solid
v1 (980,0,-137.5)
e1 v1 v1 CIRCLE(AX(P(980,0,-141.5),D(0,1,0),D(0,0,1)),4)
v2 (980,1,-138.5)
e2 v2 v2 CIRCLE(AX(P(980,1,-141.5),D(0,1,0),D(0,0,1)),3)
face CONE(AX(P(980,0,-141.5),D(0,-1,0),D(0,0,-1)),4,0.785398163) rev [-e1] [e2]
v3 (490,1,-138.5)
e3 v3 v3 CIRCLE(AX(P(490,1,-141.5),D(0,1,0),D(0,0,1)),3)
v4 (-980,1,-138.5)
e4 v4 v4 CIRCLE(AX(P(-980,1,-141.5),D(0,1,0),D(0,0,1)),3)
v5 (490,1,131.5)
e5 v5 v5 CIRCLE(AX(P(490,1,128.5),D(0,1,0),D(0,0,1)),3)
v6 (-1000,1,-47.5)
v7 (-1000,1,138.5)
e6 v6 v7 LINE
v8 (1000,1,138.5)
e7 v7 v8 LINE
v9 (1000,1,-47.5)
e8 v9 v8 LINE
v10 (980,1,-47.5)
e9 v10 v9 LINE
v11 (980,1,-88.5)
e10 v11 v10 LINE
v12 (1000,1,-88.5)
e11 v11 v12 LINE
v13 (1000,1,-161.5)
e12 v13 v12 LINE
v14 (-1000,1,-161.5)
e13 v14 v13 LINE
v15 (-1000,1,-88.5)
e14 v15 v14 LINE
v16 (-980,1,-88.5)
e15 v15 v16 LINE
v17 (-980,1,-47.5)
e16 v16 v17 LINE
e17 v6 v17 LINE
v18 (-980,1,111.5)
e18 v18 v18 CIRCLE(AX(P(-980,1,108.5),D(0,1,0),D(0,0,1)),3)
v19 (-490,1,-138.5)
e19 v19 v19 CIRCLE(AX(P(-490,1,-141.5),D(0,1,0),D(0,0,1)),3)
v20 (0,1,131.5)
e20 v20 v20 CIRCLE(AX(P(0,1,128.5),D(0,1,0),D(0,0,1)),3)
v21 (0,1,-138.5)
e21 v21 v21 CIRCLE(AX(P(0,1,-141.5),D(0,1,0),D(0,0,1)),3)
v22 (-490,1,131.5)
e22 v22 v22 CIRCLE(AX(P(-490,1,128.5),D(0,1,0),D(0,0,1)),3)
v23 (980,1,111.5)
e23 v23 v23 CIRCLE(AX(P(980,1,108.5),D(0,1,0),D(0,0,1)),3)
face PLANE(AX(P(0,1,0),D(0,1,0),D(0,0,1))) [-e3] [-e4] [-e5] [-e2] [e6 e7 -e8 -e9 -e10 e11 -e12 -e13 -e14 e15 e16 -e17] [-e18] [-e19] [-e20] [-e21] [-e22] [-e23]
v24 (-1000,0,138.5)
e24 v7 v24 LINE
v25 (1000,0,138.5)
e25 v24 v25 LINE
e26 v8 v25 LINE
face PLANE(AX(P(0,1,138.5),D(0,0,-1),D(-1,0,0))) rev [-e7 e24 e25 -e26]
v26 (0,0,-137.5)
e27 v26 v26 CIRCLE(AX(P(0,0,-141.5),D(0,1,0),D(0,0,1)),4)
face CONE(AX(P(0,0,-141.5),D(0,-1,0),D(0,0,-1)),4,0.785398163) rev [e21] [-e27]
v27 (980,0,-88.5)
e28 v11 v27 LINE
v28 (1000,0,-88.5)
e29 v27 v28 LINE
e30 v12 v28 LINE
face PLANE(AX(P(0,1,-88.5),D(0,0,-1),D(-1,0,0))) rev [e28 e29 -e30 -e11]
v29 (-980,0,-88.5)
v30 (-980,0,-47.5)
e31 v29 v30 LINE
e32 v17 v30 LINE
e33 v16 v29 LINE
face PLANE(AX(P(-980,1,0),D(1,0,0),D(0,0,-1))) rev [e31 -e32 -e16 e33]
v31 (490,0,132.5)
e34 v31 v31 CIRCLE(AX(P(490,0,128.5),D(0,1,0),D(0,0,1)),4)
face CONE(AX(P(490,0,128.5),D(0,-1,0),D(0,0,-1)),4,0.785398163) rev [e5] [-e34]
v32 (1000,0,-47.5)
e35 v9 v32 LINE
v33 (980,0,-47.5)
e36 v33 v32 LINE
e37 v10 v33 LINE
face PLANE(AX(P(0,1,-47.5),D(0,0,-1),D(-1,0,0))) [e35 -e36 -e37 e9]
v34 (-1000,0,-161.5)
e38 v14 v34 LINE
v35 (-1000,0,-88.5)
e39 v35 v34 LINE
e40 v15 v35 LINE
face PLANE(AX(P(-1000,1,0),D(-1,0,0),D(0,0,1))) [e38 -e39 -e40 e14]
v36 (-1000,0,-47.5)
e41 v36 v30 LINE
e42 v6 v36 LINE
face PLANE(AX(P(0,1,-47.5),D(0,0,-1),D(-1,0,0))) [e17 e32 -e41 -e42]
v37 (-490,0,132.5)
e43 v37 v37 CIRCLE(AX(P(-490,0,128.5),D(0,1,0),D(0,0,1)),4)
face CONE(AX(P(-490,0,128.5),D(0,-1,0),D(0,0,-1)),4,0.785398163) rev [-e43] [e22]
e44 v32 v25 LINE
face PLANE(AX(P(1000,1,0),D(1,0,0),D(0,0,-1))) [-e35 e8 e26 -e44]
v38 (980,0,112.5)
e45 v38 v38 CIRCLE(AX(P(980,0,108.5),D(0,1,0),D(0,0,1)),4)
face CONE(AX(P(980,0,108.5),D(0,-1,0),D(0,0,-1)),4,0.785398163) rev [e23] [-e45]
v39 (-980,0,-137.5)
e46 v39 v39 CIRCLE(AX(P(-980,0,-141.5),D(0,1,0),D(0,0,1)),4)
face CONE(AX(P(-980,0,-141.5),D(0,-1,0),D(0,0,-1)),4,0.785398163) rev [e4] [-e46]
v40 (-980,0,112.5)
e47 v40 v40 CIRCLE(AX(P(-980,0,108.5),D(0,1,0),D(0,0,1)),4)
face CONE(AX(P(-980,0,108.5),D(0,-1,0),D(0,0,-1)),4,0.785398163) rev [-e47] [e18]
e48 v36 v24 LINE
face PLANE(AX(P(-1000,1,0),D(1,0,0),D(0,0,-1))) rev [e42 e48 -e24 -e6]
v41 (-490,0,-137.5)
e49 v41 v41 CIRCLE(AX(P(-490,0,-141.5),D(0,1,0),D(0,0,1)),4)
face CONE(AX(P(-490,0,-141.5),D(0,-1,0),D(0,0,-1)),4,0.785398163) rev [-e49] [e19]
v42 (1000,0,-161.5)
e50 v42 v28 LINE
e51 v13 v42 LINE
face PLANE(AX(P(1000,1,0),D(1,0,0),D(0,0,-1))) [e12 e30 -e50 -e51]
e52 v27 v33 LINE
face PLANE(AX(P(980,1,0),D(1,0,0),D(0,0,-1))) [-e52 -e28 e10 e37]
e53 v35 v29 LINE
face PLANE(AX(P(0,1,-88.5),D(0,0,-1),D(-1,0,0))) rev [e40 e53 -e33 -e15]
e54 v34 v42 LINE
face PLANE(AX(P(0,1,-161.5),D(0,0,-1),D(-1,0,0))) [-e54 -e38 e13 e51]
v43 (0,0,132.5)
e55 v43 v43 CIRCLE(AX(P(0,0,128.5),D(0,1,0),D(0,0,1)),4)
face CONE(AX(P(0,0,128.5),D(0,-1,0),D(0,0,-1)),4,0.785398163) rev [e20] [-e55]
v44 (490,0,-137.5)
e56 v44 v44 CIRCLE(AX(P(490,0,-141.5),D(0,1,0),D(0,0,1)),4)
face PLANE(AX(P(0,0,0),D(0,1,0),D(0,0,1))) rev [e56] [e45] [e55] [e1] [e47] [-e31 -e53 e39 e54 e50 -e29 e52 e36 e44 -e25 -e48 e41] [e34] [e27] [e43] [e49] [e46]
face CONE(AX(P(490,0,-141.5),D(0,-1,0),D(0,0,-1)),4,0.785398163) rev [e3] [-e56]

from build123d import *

# Parameters (mm, degrees)
SKETCH1_R           = 3
BOSS_EXTRUDE1_DEPTH = 1
CHAMFER1_SIZE       = 1


with BuildPart() as part:
    # Sketch1 → Boss-Extrude1 (new body)
    with BuildSketch(Plane(origin=(0, 0, 0), x_dir=(1, 0, 0), z_dir=(0, 1, 0))):
        Polygon((-1000, 88.5), (-980, 88.5), (-980, 47.5), (-1000, 47.5), (-1000, -138.5), (1000, -138.5), (1000, 47.5), (980, 47.5), (980, 88.5), (1000, 88.5), (1000, 158.5), (1000, 161.5), (-1000, 161.5), (-1000, 158.5), align=None)
        with Locations(Location((-980, 141.5, 0), (0, 0, 270))):
            Circle(SKETCH1_R, mode=Mode.SUBTRACT)
        with Locations(Location((980, 141.5, 0), (0, 0, 270))):
            Circle(SKETCH1_R, mode=Mode.SUBTRACT)
        with Locations(Location((0, 141.5, 0), (0, 0, 270))):
            Circle(SKETCH1_R, mode=Mode.SUBTRACT)
        with Locations(Location((490, 141.5, 0), (0, 0, 270))):
            Circle(SKETCH1_R, mode=Mode.SUBTRACT)
        with Locations(Location((-490, 141.5, 0), (0, 0, 270))):
            Circle(SKETCH1_R, mode=Mode.SUBTRACT)
        with Locations(Location((490, -128.5, 0), (0, 0, 270))):
            Circle(SKETCH1_R, mode=Mode.SUBTRACT)
        with Locations(Location((980, -108.5, 0), (0, 0, 270))):
            Circle(SKETCH1_R, mode=Mode.SUBTRACT)
        with Locations(Location((0, -128.5, 0), (0, 0, 270))):
            Circle(SKETCH1_R, mode=Mode.SUBTRACT)
        with Locations(Location((-490, -128.5, 0), (0, 0, 270))):
            Circle(SKETCH1_R, mode=Mode.SUBTRACT)
        with Locations(Location((-980, -108.5, 0), (0, 0, 270))):
            Circle(SKETCH1_R, mode=Mode.SUBTRACT)
    extrude(amount=BOSS_EXTRUDE1_DEPTH)

    # Chamfer1
    chamfer1_edges = [part.edges().sort_by_distance(p)[0] for p in [
        (-980, 0, -144.5),
        (980, 0, -144.5),
        (0, 0, -144.5),
        (490, 0, -144.5),
        (-490, 0, -144.5),
        (490, 0, 125.5),
        (980, 0, 105.5),
        (0, 0, 125.5),
        (-490, 0, 125.5),
        (-980, 0, 105.5),
    ]]
    chamfer(chamfer1_edges, length=CHAMFER1_SIZE - 0.0001)  # a hair under: the kernel refuses the full size


solid = part.part
